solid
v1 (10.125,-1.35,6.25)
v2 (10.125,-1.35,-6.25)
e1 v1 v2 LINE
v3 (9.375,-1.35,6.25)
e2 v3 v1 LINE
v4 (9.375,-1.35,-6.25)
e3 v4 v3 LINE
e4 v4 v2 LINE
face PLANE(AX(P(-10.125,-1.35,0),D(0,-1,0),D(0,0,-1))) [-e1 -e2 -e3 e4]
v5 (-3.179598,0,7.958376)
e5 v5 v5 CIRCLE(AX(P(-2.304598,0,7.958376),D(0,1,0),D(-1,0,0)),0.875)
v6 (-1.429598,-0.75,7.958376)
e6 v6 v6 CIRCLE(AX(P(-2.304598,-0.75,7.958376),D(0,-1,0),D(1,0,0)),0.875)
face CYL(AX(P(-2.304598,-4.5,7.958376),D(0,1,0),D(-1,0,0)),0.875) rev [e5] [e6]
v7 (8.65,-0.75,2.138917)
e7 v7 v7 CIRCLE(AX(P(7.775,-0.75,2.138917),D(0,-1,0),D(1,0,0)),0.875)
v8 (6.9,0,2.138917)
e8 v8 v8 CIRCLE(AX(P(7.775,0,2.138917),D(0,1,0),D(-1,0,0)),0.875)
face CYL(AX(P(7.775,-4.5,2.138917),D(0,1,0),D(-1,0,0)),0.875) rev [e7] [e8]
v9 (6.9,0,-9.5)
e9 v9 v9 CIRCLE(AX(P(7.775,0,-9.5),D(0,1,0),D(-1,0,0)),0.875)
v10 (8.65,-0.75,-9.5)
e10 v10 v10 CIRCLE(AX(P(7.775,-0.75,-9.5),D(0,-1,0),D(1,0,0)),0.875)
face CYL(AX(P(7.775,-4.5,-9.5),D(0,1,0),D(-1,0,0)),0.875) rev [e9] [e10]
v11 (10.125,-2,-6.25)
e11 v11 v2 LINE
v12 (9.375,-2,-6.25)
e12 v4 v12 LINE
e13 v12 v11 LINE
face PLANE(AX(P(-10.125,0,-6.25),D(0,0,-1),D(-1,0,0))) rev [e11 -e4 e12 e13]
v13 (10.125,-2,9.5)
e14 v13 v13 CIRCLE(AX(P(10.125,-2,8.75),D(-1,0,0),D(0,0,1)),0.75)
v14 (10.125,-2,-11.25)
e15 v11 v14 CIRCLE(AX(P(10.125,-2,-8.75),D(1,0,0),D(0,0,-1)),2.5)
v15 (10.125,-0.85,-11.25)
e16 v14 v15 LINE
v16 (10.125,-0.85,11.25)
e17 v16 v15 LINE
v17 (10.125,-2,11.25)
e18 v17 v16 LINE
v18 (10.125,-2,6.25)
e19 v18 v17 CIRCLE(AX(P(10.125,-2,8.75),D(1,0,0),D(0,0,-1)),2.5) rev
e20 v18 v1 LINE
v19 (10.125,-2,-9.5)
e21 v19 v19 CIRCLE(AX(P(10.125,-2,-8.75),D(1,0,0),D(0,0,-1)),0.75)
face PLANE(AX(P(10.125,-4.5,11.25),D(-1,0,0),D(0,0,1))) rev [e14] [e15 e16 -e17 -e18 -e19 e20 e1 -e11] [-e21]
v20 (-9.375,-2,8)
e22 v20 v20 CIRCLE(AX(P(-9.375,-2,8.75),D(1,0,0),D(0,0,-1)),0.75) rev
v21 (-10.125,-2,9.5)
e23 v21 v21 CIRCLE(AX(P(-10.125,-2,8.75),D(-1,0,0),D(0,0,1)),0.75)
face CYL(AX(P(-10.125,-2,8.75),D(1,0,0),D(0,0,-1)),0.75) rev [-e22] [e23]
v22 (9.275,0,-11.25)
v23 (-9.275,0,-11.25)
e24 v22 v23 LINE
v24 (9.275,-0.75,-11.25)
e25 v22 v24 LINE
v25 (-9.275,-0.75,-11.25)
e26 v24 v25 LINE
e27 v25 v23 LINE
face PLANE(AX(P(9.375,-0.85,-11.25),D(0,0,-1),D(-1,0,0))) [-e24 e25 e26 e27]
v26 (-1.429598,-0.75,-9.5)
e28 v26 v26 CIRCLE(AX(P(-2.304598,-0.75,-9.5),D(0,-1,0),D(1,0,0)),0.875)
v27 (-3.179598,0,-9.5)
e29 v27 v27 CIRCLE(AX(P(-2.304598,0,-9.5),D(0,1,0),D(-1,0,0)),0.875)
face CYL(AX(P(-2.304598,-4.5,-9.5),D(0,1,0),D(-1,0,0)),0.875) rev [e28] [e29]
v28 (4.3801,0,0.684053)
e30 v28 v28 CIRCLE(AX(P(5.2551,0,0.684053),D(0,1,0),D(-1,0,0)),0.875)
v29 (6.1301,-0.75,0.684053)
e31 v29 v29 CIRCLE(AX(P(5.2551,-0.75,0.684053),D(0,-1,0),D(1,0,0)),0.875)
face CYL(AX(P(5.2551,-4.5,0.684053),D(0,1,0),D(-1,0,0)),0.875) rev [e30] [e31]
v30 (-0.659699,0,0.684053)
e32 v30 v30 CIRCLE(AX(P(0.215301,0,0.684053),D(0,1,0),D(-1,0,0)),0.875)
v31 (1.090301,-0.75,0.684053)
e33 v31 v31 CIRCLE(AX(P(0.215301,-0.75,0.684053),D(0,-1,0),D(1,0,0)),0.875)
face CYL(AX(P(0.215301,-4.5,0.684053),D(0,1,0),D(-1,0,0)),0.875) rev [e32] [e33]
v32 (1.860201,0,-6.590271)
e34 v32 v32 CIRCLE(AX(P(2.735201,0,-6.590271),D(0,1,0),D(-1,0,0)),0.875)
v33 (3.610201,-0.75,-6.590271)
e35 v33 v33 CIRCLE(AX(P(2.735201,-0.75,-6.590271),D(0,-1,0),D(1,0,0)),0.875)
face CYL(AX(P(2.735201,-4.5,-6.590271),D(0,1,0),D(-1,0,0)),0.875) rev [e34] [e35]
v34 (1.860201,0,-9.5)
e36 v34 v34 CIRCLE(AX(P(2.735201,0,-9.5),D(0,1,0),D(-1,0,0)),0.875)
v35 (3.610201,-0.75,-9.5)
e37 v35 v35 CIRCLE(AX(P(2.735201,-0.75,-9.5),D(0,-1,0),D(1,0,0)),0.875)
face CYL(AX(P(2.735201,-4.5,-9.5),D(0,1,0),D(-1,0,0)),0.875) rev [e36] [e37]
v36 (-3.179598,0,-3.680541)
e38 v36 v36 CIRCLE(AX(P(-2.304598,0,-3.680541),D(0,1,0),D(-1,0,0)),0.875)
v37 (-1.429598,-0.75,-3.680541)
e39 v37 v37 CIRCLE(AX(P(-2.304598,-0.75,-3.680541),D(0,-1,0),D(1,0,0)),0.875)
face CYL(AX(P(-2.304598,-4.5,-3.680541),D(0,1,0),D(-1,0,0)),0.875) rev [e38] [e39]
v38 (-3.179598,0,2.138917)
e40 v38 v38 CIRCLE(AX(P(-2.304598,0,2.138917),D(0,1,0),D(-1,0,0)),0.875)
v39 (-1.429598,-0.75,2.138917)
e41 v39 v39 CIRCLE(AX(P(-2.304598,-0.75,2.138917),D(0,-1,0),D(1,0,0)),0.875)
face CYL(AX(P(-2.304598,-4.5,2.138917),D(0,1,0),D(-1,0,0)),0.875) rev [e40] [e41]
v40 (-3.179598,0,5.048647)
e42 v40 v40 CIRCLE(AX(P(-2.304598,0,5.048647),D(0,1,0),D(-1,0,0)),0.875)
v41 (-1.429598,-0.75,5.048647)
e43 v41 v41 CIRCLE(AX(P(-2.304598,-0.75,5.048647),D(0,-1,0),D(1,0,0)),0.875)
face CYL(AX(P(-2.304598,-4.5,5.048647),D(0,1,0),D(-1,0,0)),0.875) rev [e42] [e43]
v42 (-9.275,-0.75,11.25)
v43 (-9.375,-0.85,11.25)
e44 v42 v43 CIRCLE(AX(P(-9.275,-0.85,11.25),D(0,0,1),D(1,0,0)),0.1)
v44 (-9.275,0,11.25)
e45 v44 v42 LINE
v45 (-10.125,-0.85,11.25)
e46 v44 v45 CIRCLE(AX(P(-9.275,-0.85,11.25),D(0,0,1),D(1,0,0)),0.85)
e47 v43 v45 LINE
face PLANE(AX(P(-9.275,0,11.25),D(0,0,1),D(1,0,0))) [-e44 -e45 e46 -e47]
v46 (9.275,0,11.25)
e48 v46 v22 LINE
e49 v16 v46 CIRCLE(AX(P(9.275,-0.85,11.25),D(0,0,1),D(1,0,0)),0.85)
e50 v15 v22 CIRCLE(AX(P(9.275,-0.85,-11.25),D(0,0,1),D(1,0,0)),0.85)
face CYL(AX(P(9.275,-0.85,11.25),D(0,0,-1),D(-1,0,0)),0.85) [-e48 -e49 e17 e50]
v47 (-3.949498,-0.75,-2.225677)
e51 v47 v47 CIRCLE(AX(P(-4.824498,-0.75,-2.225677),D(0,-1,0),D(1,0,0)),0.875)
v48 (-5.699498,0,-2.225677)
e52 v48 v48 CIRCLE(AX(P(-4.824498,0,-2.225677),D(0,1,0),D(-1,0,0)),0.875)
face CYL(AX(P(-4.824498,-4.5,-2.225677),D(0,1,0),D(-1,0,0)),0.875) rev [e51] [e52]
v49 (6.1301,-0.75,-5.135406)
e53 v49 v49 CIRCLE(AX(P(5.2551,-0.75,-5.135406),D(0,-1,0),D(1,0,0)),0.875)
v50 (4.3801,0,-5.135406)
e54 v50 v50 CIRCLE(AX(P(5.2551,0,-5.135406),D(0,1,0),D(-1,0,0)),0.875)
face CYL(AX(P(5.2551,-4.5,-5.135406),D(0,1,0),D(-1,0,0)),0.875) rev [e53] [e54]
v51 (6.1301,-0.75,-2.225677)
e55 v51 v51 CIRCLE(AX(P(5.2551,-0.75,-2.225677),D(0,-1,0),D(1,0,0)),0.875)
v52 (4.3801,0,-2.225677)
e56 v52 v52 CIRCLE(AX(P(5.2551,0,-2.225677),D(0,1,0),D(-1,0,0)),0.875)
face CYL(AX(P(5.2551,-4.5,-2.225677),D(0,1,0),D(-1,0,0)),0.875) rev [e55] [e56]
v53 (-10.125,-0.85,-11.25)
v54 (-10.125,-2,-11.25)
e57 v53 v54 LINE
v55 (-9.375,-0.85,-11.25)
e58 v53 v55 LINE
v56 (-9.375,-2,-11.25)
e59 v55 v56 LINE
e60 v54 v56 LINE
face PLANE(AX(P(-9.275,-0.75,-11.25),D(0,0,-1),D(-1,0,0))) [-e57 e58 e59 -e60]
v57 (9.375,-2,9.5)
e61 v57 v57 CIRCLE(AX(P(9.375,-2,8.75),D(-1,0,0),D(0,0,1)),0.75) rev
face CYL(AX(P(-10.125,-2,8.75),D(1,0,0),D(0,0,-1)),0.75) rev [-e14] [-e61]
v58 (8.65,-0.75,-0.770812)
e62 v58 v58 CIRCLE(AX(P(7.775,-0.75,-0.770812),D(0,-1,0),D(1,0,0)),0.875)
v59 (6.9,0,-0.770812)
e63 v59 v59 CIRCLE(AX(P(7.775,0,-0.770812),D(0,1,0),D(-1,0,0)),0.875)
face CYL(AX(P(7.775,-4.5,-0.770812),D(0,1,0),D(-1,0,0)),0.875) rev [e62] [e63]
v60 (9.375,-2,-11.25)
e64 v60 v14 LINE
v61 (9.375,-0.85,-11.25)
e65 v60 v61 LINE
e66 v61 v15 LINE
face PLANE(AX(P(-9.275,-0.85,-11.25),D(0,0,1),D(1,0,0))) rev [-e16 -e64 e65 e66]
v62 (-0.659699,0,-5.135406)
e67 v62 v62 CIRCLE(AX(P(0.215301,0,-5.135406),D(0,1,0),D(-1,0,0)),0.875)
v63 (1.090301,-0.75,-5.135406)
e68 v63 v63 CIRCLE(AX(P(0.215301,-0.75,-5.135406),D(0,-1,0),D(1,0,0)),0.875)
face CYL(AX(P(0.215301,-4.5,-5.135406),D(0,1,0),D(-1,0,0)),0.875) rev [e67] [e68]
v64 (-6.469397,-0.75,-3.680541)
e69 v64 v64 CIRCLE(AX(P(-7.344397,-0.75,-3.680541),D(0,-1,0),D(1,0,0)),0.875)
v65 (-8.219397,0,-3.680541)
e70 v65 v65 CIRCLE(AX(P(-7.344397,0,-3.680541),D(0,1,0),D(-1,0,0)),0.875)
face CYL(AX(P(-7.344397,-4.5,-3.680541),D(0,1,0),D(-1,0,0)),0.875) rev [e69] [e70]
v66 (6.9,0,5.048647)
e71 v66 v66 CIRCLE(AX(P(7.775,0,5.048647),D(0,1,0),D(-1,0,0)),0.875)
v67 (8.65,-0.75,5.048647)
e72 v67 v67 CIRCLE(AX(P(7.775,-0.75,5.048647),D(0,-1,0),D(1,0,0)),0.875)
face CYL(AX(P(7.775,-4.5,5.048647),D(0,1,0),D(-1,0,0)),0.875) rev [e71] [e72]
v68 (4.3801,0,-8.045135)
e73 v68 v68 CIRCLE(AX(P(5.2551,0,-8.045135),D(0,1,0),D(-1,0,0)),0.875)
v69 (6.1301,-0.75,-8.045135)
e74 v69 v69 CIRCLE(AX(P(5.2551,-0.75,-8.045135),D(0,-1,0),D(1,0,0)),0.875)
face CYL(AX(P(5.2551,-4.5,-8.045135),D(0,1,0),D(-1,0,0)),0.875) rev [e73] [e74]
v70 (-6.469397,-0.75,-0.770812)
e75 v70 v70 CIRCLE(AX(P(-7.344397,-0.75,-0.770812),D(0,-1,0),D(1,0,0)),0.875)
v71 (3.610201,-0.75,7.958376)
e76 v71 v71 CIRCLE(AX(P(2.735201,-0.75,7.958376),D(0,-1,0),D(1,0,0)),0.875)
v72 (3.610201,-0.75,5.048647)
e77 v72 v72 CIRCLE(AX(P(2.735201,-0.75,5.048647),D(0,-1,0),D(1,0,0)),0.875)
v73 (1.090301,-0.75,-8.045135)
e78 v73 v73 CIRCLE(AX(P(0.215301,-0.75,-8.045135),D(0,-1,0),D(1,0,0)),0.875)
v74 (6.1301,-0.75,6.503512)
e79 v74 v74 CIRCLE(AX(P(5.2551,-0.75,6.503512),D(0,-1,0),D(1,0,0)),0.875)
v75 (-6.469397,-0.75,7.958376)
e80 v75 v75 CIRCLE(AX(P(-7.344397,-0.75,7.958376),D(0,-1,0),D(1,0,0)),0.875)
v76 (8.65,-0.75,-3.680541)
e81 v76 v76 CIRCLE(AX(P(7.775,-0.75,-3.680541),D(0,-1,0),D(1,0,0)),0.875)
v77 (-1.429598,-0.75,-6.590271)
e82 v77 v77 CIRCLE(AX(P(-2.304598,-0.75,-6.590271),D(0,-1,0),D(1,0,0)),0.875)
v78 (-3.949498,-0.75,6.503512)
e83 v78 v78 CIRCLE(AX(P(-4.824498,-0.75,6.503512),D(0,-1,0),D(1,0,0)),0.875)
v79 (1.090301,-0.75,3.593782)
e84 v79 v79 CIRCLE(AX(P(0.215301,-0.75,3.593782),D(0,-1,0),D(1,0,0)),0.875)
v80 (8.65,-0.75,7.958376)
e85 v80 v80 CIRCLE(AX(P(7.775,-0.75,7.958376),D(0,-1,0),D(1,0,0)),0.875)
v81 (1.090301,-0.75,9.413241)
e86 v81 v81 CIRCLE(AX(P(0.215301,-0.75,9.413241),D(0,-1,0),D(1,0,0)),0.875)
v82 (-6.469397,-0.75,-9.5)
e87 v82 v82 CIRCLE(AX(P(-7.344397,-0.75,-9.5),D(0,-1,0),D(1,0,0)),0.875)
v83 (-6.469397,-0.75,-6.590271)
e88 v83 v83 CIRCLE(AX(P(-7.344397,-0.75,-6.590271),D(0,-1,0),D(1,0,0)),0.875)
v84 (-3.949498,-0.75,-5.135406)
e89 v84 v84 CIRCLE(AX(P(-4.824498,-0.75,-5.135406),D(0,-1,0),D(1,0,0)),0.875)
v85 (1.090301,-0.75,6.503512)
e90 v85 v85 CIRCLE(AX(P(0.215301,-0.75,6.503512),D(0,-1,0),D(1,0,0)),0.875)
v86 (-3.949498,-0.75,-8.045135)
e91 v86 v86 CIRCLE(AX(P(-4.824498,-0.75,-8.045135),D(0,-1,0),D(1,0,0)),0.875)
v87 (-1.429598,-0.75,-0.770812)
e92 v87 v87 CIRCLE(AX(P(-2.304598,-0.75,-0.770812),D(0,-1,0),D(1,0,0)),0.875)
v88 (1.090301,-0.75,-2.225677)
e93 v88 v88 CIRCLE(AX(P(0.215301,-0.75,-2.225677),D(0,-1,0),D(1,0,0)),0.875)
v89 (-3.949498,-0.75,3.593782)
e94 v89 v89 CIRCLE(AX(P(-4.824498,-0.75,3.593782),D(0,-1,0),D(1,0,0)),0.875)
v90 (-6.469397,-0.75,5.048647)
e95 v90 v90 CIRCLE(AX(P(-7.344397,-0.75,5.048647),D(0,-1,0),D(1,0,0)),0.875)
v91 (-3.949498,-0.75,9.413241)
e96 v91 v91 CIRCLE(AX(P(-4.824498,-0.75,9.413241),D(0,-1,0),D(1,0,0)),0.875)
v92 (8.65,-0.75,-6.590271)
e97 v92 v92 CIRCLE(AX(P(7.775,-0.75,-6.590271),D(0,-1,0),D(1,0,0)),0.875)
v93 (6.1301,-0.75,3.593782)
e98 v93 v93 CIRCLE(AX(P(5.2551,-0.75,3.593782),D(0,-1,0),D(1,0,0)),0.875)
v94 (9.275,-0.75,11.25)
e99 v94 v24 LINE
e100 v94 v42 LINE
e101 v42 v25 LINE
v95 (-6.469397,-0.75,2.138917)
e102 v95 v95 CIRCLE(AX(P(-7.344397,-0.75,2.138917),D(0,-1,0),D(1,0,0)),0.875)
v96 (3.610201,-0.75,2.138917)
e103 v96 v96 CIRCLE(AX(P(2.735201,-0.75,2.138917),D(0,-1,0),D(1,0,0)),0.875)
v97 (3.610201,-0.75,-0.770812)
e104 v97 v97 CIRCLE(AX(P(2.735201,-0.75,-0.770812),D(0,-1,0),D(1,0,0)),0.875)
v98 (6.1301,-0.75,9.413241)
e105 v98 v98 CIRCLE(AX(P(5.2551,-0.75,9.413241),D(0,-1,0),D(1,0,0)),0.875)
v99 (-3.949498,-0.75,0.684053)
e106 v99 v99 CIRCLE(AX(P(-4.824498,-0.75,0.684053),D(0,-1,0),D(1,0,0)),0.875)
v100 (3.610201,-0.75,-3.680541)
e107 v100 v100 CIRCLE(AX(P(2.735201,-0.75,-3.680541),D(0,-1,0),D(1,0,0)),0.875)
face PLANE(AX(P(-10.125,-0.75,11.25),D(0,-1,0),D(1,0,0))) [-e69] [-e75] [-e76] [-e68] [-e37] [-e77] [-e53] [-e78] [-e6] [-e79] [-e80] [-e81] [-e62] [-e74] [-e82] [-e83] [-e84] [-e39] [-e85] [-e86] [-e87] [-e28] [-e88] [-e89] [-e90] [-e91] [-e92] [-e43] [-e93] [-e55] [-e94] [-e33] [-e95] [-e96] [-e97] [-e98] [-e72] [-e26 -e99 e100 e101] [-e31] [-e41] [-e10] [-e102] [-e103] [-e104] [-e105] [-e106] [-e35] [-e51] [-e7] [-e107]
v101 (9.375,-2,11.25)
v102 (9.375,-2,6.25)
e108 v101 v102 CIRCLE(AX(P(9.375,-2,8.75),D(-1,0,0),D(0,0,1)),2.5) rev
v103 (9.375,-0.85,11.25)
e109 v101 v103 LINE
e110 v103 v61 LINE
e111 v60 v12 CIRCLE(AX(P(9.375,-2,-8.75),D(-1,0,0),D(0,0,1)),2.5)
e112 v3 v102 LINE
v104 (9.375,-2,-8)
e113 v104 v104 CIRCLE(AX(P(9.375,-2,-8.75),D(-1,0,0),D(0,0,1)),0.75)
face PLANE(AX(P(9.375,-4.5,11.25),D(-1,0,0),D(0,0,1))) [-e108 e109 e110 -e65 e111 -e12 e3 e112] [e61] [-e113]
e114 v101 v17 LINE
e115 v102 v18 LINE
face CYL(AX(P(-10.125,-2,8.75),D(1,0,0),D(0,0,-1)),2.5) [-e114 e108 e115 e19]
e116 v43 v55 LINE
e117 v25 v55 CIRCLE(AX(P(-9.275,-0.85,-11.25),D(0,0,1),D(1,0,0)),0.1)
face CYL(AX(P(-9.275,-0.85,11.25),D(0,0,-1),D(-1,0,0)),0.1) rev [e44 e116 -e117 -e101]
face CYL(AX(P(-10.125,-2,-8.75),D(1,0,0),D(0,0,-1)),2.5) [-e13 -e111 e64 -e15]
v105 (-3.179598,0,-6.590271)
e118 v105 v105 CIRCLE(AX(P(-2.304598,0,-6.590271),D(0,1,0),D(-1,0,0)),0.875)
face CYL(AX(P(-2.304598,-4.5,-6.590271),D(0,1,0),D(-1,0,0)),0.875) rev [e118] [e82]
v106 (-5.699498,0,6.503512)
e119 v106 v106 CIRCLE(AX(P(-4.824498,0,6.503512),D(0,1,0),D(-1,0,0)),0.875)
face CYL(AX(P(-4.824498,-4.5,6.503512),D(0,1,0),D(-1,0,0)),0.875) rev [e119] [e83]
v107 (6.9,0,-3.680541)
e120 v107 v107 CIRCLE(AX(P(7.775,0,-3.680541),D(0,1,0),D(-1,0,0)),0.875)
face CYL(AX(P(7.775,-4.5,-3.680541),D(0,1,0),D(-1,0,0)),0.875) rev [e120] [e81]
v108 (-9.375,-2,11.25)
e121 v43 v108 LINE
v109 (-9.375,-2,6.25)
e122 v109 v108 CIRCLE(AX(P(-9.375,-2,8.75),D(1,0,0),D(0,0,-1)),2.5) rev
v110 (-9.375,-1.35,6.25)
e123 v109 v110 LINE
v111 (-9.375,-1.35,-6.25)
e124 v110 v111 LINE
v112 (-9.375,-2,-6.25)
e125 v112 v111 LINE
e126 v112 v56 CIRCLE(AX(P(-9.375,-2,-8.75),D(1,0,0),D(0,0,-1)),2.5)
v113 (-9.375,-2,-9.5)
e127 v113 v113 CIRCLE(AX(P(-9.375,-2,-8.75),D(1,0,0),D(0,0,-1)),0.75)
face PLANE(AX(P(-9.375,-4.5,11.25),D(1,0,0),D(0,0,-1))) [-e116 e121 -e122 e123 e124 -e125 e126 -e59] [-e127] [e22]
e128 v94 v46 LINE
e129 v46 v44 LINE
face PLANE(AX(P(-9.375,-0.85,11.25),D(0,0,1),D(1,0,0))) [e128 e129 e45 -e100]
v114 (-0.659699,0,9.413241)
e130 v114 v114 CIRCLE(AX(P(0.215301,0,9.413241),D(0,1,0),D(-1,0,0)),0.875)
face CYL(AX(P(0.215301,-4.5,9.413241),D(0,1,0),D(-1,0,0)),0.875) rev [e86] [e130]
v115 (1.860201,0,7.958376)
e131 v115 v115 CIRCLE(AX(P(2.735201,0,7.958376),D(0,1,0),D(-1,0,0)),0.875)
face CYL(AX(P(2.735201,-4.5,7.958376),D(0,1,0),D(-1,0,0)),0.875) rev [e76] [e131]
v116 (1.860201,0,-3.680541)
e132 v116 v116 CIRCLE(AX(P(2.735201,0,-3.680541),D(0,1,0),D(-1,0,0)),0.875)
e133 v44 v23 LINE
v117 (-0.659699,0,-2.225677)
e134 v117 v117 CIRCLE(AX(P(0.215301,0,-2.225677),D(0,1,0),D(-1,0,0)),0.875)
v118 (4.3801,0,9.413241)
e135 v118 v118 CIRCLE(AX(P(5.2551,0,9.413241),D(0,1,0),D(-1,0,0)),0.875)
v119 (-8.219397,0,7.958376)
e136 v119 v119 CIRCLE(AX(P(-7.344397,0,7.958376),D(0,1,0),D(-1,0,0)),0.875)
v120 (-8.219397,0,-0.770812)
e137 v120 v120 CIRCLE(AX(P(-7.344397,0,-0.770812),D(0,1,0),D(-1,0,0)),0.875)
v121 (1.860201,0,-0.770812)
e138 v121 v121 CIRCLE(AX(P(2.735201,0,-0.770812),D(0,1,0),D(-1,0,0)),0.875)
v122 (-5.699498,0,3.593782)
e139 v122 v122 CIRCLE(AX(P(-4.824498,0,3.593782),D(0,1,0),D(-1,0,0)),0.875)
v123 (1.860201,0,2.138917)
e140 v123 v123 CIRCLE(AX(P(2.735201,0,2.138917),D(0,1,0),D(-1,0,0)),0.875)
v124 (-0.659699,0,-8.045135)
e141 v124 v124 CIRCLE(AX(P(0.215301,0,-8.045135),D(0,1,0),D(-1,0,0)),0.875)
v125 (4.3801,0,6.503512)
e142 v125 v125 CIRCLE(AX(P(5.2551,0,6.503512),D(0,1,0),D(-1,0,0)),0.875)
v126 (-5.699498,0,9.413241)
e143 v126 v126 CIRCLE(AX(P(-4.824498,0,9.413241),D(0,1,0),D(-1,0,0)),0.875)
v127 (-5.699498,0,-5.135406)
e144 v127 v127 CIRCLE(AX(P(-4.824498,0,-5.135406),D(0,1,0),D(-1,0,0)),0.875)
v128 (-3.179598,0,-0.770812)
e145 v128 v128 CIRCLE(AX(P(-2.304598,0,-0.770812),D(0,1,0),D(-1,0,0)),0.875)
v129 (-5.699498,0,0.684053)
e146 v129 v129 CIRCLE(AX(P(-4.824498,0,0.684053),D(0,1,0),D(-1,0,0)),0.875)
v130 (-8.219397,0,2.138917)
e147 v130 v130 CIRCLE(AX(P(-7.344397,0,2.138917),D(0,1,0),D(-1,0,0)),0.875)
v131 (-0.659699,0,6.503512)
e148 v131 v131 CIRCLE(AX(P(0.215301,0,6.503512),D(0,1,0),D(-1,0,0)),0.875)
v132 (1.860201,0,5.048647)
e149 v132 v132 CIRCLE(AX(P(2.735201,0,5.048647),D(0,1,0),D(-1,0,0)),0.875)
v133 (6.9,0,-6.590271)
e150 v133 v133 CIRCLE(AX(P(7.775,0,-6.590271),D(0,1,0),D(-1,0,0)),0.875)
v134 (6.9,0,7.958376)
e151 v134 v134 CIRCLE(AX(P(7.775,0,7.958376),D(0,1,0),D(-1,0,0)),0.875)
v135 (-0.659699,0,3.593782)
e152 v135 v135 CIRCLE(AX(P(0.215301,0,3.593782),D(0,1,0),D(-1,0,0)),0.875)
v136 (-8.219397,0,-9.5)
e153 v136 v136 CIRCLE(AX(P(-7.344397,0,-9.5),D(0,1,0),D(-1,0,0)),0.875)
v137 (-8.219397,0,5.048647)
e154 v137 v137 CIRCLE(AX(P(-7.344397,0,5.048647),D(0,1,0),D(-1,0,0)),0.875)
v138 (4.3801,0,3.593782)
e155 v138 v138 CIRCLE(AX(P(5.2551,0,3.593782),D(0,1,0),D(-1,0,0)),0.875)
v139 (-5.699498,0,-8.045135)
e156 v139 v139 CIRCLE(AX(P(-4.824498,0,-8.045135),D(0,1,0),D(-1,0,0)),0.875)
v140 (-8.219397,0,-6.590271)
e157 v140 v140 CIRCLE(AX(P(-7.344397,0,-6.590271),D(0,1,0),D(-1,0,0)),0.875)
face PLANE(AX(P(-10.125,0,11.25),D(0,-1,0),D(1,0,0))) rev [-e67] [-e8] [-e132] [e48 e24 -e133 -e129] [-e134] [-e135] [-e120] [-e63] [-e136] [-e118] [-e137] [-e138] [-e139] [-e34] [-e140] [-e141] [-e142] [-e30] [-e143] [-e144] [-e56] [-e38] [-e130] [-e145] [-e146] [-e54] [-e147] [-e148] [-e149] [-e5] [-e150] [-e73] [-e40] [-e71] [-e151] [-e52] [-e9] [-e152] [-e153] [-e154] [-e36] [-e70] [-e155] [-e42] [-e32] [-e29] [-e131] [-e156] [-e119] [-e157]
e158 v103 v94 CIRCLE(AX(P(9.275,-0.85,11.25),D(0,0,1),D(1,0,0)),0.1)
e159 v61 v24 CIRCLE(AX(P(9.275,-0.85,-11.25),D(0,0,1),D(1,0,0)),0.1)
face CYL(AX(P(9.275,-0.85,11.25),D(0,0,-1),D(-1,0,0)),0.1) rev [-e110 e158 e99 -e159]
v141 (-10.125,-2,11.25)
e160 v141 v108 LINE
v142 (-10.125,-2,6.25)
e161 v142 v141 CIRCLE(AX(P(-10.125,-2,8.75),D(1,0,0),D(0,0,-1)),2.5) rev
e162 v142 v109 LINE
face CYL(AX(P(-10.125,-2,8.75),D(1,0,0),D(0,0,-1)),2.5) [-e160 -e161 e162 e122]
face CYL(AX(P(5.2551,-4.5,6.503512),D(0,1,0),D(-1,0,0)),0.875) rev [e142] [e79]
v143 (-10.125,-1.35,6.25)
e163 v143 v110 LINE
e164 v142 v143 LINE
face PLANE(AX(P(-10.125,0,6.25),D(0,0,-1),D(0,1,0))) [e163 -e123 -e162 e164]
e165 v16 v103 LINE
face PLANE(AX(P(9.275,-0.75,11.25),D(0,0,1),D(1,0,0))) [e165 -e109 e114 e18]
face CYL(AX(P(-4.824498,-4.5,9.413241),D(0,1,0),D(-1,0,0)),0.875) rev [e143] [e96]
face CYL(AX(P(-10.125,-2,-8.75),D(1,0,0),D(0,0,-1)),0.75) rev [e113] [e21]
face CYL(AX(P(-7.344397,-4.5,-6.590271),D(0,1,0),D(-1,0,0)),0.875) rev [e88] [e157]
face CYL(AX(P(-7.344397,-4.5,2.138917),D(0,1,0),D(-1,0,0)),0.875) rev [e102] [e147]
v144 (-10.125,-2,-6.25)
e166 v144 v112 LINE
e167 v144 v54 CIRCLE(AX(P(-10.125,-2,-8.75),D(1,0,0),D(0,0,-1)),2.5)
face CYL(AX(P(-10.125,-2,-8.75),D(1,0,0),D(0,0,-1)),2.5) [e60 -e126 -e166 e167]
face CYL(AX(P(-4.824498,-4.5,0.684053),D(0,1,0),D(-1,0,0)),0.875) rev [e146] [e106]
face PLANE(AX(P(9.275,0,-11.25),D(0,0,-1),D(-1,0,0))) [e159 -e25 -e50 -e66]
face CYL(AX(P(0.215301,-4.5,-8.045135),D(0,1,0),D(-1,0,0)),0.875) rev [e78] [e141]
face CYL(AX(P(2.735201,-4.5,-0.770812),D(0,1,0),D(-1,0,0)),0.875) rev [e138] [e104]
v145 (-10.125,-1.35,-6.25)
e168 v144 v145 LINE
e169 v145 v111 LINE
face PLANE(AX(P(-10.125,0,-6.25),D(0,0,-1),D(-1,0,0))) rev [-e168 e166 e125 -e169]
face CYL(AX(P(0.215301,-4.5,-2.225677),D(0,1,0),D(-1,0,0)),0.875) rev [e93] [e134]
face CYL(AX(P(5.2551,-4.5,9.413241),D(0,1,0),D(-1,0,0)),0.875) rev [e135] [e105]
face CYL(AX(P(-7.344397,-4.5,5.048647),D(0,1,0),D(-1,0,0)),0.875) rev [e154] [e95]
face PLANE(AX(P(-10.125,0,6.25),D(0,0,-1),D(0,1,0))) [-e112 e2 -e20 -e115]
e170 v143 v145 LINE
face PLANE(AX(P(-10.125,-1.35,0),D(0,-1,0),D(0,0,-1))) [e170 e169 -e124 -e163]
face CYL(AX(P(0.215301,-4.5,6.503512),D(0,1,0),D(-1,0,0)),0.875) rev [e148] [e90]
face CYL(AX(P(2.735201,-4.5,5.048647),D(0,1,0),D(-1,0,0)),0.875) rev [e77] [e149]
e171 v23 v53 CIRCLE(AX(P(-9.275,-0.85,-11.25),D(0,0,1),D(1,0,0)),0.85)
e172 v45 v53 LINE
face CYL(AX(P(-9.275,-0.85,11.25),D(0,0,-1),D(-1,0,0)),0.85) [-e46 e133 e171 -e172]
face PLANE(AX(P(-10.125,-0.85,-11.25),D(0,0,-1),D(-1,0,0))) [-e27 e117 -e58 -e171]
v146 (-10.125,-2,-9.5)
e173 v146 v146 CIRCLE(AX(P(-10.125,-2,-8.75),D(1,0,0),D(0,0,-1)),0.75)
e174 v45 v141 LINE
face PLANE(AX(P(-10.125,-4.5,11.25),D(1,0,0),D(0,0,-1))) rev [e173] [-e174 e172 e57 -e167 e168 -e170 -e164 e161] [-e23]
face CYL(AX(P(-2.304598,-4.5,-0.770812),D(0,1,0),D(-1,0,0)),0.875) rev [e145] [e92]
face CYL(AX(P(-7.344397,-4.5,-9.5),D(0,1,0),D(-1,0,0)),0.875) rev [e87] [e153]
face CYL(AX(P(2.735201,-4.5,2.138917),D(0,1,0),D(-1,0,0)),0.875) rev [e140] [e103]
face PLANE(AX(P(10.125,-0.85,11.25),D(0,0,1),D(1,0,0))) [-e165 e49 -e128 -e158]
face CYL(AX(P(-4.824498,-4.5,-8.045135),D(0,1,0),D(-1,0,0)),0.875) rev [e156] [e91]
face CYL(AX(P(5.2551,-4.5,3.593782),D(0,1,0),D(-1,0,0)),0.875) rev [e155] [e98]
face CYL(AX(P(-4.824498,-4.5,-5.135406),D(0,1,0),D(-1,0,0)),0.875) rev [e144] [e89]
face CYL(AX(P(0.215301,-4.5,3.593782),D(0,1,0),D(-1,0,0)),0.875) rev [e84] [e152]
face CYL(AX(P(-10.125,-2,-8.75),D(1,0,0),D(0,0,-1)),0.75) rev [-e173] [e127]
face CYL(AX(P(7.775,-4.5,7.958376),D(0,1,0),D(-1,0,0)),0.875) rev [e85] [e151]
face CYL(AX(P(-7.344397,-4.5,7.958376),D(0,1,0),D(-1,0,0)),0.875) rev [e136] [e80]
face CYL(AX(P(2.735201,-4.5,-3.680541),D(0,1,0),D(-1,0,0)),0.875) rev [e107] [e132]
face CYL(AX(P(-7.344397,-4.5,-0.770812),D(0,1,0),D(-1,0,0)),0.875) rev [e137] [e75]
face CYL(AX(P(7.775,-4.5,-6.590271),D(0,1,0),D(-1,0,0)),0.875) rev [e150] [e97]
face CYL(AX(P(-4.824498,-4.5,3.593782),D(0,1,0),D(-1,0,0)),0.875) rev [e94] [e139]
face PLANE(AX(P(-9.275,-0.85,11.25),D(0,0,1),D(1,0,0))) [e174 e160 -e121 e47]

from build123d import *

# Parameters (mm, degrees)
BASE_FLANGE1_DEPTH      = 11.25
SKETCH7_R               = 0.75
CUT_EXTRUDE1_DEPTH      = 24.598199084
SKETCH9_R               = 0.875
CUT_EXTRUDE2_DEPTH      = 16.790127454
FILL_START              = -0.75
FILL_PATTERN1_OUTLINE_R = 0.875
FILL_PATTERN1_DEPTH     = 0.75


# Read off the part's stored shape, not the designer's step: Fill Pattern1
# Sheet-metal steps are written as plain solids
with BuildPart() as part:
    # Sketch1 → Base-Flange1 (new, symmetric)
    with BuildSketch(Plane.XY):
        with BuildLine():
            Line((-10.125, -4.5), (-10.125, -0.85))
            ThreePointArc((-10.125, -0.85), (-9.876040764, -0.248959236), (-9.275, 0))
            Line((-9.275, 0), (9.275, 0))
            ThreePointArc((9.275, 0), (9.876040764, -0.248959236), (10.125, -0.85))
            Line((10.125, -0.85), (10.125, -4.5))
            Line((10.125, -4.5), (9.375, -4.5))
            Line((9.375, -4.5), (9.375, -0.85))
            ThreePointArc((9.375, -0.85), (9.345710678, -0.779289322), (9.275, -0.75))
            Line((9.275, -0.75), (-9.275, -0.75))
            ThreePointArc((-9.275, -0.75), (-9.345710678, -0.779289322), (-9.375, -0.85))
            Line((-9.375, -0.85), (-9.375, -4.5))
            Line((-9.375, -4.5), (-10.125, -4.5))
        make_face()
    extrude(amount=BASE_FLANGE1_DEPTH, both=True)

    # Sketch7 → Cut-Extrude1 (cut, through all)
    with BuildSketch(Plane(origin=(10.125, 0, 0), x_dir=(0, 0, -1), z_dir=(1, 0, 0))):
        with BuildLine():
            Line((-6.25, -1.35), (-6.25, -2))
            ThreePointArc((-6.25, -2), (-6.982233047, -3.767766953), (-8.75, -4.5))
            Line((-8.75, -4.5), (8.749999987, -4.5))
            ThreePointArc((8.749999987, -4.5), (6.982233042, -3.767766948), (6.25, -2))
            Line((6.25, -2), (6.25, -1.35))
            Line((6.25, -1.35), (-6.25, -1.35))
        make_face()
        with BuildLine():
            Line((-11.25, -4.5), (-8.75, -4.5))
            ThreePointArc((-8.75, -4.5), (-10.517766953, -3.767766953), (-11.25, -2))
            Line((-11.25, -2), (-11.25, -4.5))
        make_face()
        with BuildLine():
            ThreePointArc((11.25, -2), (10.517766948, -3.767766958), (8.749999987, -4.5))
            Line((8.749999987, -4.5), (11.25, -4.5))
            Line((11.25, -4.5), (11.25, -2))
        make_face()
        with Locations((8.75, -2)):
            Circle(SKETCH7_R)
        with Locations(Location((-8.75, -2, 0), (0, 0, 180))):
            Circle(SKETCH7_R)
    extrude(amount=-CUT_EXTRUDE1_DEPTH, mode=Mode.SUBTRACT)

    # Sketch9 → Cut-Extrude2 (cut, through all)
    with BuildSketch(Plane(origin=(0, 0, 0), x_dir=(1, 0, 0), z_dir=(0, 1, 0))):
        with Locations(Location((7.775, 9.5, 0), (0, 0, 180))):
            Circle(SKETCH9_R)
    extrude(amount=-CUT_EXTRUDE2_DEPTH, mode=Mode.SUBTRACT)

    # Fill Pattern1 outline → Fill Pattern1 (cut)
    with BuildSketch(Plane(origin=(0, 0, 0), x_dir=(1, 0, 0), z_dir=(0, 1, 0)).offset(FILL_START)):
        with Locations((-4.824497758, -9.413240898)):
            Circle(FILL_PATTERN1_OUTLINE_R)
        with Locations((-2.304598206, 6.590270631)):
            Circle(FILL_PATTERN1_OUTLINE_R)
        with Locations((-4.824497758, 8.045135316)):
            Circle(FILL_PATTERN1_OUTLINE_R)
        with Locations((-7.344397309, 9.5)):
            Circle(FILL_PATTERN1_OUTLINE_R)
        with Locations((7.775, 3.680541262)):
            Circle(FILL_PATTERN1_OUTLINE_R)
        with Locations((0.215301345, 5.135405947)):
            Circle(FILL_PATTERN1_OUTLINE_R)
        with Locations((2.735200897, 3.680541262)):
            Circle(FILL_PATTERN1_OUTLINE_R)
        with Locations((5.255100448, 2.225676578)):
            Circle(FILL_PATTERN1_OUTLINE_R)
        with Locations((7.775, 0.770811893)):
            Circle(FILL_PATTERN1_OUTLINE_R)
        with Locations((2.735200897, 9.5)):
            Circle(FILL_PATTERN1_OUTLINE_R)
        with Locations((5.255100448, 8.045135316)):
            Circle(FILL_PATTERN1_OUTLINE_R)
        with Locations((7.775, 6.590270631)):
            Circle(FILL_PATTERN1_OUTLINE_R)
        with Locations((-2.304598206, 9.5)):
            Circle(FILL_PATTERN1_OUTLINE_R)
        with Locations((0.215301345, 8.045135316)):
            Circle(FILL_PATTERN1_OUTLINE_R)
        with Locations((2.735200897, 6.590270631)):
            Circle(FILL_PATTERN1_OUTLINE_R)
        with Locations((5.255100448, 5.135405947)):
            Circle(FILL_PATTERN1_OUTLINE_R)
        with Locations((7.775, -7.958376213)):
            Circle(FILL_PATTERN1_OUTLINE_R)
        with Locations((-7.344397309, -2.138917475)):
            Circle(FILL_PATTERN1_OUTLINE_R)
        with Locations((-4.824497758, -3.59378216)):
            Circle(FILL_PATTERN1_OUTLINE_R)
        with Locations((-2.304598206, -5.048646844)):
            Circle(FILL_PATTERN1_OUTLINE_R)
        with Locations((5.255100448, -6.503511529)):
            Circle(FILL_PATTERN1_OUTLINE_R)
        with Locations((2.735200897, -5.048646844)):
            Circle(FILL_PATTERN1_OUTLINE_R)
        with Locations((0.215301345, -3.59378216)):
            Circle(FILL_PATTERN1_OUTLINE_R)
        with Locations((-2.304598206, -2.138917475)):
            Circle(FILL_PATTERN1_OUTLINE_R)
        with Locations((-4.824497758, -6.503511529)):
            Circle(FILL_PATTERN1_OUTLINE_R)
        with Locations((-2.304598206, -7.958376213)):
            Circle(FILL_PATTERN1_OUTLINE_R)
        with Locations((0.215301345, -9.413240898)):
            Circle(FILL_PATTERN1_OUTLINE_R)
        with Locations((-7.344397309, -7.958376213)):
            Circle(FILL_PATTERN1_OUTLINE_R)
        with Locations((0.215301345, -6.503511529)):
            Circle(FILL_PATTERN1_OUTLINE_R)
        with Locations((2.735200897, -7.958376213)):
            Circle(FILL_PATTERN1_OUTLINE_R)
        with Locations((5.255100448, -9.413240898)):
            Circle(FILL_PATTERN1_OUTLINE_R)
        with Locations((-7.344397309, -5.048646844)):
            Circle(FILL_PATTERN1_OUTLINE_R)
        with Locations((2.735200897, 0.770811893)):
            Circle(FILL_PATTERN1_OUTLINE_R)
        with Locations((5.255100448, -0.684052791)):
            Circle(FILL_PATTERN1_OUTLINE_R)
        with Locations((7.775, -2.138917475)):
            Circle(FILL_PATTERN1_OUTLINE_R)
        with Locations((-7.344397309, 3.680541262)):
            Circle(FILL_PATTERN1_OUTLINE_R)
        with Locations((0.215301345, 2.225676578)):
            Circle(FILL_PATTERN1_OUTLINE_R)
        with Locations((-2.304598206, 3.680541262)):
            Circle(FILL_PATTERN1_OUTLINE_R)
        with Locations((-4.824497758, 5.135405947)):
            Circle(FILL_PATTERN1_OUTLINE_R)
        with Locations((-7.344397309, 6.590270631)):
            Circle(FILL_PATTERN1_OUTLINE_R)
        with Locations((-4.824497758, -0.684052791)):
            Circle(FILL_PATTERN1_OUTLINE_R)
        with Locations((-7.344397309, 0.770811893)):
            Circle(FILL_PATTERN1_OUTLINE_R)
        with Locations((7.775, -5.048646844)):
            Circle(FILL_PATTERN1_OUTLINE_R)
        with Locations((5.255100448, -3.59378216)):
            Circle(FILL_PATTERN1_OUTLINE_R)
        with Locations((2.735200897, -2.138917475)):
            Circle(FILL_PATTERN1_OUTLINE_R)
        with Locations((0.215301345, -0.684052791)):
            Circle(FILL_PATTERN1_OUTLINE_R)
        with Locations((-2.304598206, 0.770811893)):
            Circle(FILL_PATTERN1_OUTLINE_R)
        with Locations((-4.824497758, 2.225676578)):
            Circle(FILL_PATTERN1_OUTLINE_R)
    extrude(amount=FILL_PATTERN1_DEPTH, mode=Mode.SUBTRACT)


solid = part.part
